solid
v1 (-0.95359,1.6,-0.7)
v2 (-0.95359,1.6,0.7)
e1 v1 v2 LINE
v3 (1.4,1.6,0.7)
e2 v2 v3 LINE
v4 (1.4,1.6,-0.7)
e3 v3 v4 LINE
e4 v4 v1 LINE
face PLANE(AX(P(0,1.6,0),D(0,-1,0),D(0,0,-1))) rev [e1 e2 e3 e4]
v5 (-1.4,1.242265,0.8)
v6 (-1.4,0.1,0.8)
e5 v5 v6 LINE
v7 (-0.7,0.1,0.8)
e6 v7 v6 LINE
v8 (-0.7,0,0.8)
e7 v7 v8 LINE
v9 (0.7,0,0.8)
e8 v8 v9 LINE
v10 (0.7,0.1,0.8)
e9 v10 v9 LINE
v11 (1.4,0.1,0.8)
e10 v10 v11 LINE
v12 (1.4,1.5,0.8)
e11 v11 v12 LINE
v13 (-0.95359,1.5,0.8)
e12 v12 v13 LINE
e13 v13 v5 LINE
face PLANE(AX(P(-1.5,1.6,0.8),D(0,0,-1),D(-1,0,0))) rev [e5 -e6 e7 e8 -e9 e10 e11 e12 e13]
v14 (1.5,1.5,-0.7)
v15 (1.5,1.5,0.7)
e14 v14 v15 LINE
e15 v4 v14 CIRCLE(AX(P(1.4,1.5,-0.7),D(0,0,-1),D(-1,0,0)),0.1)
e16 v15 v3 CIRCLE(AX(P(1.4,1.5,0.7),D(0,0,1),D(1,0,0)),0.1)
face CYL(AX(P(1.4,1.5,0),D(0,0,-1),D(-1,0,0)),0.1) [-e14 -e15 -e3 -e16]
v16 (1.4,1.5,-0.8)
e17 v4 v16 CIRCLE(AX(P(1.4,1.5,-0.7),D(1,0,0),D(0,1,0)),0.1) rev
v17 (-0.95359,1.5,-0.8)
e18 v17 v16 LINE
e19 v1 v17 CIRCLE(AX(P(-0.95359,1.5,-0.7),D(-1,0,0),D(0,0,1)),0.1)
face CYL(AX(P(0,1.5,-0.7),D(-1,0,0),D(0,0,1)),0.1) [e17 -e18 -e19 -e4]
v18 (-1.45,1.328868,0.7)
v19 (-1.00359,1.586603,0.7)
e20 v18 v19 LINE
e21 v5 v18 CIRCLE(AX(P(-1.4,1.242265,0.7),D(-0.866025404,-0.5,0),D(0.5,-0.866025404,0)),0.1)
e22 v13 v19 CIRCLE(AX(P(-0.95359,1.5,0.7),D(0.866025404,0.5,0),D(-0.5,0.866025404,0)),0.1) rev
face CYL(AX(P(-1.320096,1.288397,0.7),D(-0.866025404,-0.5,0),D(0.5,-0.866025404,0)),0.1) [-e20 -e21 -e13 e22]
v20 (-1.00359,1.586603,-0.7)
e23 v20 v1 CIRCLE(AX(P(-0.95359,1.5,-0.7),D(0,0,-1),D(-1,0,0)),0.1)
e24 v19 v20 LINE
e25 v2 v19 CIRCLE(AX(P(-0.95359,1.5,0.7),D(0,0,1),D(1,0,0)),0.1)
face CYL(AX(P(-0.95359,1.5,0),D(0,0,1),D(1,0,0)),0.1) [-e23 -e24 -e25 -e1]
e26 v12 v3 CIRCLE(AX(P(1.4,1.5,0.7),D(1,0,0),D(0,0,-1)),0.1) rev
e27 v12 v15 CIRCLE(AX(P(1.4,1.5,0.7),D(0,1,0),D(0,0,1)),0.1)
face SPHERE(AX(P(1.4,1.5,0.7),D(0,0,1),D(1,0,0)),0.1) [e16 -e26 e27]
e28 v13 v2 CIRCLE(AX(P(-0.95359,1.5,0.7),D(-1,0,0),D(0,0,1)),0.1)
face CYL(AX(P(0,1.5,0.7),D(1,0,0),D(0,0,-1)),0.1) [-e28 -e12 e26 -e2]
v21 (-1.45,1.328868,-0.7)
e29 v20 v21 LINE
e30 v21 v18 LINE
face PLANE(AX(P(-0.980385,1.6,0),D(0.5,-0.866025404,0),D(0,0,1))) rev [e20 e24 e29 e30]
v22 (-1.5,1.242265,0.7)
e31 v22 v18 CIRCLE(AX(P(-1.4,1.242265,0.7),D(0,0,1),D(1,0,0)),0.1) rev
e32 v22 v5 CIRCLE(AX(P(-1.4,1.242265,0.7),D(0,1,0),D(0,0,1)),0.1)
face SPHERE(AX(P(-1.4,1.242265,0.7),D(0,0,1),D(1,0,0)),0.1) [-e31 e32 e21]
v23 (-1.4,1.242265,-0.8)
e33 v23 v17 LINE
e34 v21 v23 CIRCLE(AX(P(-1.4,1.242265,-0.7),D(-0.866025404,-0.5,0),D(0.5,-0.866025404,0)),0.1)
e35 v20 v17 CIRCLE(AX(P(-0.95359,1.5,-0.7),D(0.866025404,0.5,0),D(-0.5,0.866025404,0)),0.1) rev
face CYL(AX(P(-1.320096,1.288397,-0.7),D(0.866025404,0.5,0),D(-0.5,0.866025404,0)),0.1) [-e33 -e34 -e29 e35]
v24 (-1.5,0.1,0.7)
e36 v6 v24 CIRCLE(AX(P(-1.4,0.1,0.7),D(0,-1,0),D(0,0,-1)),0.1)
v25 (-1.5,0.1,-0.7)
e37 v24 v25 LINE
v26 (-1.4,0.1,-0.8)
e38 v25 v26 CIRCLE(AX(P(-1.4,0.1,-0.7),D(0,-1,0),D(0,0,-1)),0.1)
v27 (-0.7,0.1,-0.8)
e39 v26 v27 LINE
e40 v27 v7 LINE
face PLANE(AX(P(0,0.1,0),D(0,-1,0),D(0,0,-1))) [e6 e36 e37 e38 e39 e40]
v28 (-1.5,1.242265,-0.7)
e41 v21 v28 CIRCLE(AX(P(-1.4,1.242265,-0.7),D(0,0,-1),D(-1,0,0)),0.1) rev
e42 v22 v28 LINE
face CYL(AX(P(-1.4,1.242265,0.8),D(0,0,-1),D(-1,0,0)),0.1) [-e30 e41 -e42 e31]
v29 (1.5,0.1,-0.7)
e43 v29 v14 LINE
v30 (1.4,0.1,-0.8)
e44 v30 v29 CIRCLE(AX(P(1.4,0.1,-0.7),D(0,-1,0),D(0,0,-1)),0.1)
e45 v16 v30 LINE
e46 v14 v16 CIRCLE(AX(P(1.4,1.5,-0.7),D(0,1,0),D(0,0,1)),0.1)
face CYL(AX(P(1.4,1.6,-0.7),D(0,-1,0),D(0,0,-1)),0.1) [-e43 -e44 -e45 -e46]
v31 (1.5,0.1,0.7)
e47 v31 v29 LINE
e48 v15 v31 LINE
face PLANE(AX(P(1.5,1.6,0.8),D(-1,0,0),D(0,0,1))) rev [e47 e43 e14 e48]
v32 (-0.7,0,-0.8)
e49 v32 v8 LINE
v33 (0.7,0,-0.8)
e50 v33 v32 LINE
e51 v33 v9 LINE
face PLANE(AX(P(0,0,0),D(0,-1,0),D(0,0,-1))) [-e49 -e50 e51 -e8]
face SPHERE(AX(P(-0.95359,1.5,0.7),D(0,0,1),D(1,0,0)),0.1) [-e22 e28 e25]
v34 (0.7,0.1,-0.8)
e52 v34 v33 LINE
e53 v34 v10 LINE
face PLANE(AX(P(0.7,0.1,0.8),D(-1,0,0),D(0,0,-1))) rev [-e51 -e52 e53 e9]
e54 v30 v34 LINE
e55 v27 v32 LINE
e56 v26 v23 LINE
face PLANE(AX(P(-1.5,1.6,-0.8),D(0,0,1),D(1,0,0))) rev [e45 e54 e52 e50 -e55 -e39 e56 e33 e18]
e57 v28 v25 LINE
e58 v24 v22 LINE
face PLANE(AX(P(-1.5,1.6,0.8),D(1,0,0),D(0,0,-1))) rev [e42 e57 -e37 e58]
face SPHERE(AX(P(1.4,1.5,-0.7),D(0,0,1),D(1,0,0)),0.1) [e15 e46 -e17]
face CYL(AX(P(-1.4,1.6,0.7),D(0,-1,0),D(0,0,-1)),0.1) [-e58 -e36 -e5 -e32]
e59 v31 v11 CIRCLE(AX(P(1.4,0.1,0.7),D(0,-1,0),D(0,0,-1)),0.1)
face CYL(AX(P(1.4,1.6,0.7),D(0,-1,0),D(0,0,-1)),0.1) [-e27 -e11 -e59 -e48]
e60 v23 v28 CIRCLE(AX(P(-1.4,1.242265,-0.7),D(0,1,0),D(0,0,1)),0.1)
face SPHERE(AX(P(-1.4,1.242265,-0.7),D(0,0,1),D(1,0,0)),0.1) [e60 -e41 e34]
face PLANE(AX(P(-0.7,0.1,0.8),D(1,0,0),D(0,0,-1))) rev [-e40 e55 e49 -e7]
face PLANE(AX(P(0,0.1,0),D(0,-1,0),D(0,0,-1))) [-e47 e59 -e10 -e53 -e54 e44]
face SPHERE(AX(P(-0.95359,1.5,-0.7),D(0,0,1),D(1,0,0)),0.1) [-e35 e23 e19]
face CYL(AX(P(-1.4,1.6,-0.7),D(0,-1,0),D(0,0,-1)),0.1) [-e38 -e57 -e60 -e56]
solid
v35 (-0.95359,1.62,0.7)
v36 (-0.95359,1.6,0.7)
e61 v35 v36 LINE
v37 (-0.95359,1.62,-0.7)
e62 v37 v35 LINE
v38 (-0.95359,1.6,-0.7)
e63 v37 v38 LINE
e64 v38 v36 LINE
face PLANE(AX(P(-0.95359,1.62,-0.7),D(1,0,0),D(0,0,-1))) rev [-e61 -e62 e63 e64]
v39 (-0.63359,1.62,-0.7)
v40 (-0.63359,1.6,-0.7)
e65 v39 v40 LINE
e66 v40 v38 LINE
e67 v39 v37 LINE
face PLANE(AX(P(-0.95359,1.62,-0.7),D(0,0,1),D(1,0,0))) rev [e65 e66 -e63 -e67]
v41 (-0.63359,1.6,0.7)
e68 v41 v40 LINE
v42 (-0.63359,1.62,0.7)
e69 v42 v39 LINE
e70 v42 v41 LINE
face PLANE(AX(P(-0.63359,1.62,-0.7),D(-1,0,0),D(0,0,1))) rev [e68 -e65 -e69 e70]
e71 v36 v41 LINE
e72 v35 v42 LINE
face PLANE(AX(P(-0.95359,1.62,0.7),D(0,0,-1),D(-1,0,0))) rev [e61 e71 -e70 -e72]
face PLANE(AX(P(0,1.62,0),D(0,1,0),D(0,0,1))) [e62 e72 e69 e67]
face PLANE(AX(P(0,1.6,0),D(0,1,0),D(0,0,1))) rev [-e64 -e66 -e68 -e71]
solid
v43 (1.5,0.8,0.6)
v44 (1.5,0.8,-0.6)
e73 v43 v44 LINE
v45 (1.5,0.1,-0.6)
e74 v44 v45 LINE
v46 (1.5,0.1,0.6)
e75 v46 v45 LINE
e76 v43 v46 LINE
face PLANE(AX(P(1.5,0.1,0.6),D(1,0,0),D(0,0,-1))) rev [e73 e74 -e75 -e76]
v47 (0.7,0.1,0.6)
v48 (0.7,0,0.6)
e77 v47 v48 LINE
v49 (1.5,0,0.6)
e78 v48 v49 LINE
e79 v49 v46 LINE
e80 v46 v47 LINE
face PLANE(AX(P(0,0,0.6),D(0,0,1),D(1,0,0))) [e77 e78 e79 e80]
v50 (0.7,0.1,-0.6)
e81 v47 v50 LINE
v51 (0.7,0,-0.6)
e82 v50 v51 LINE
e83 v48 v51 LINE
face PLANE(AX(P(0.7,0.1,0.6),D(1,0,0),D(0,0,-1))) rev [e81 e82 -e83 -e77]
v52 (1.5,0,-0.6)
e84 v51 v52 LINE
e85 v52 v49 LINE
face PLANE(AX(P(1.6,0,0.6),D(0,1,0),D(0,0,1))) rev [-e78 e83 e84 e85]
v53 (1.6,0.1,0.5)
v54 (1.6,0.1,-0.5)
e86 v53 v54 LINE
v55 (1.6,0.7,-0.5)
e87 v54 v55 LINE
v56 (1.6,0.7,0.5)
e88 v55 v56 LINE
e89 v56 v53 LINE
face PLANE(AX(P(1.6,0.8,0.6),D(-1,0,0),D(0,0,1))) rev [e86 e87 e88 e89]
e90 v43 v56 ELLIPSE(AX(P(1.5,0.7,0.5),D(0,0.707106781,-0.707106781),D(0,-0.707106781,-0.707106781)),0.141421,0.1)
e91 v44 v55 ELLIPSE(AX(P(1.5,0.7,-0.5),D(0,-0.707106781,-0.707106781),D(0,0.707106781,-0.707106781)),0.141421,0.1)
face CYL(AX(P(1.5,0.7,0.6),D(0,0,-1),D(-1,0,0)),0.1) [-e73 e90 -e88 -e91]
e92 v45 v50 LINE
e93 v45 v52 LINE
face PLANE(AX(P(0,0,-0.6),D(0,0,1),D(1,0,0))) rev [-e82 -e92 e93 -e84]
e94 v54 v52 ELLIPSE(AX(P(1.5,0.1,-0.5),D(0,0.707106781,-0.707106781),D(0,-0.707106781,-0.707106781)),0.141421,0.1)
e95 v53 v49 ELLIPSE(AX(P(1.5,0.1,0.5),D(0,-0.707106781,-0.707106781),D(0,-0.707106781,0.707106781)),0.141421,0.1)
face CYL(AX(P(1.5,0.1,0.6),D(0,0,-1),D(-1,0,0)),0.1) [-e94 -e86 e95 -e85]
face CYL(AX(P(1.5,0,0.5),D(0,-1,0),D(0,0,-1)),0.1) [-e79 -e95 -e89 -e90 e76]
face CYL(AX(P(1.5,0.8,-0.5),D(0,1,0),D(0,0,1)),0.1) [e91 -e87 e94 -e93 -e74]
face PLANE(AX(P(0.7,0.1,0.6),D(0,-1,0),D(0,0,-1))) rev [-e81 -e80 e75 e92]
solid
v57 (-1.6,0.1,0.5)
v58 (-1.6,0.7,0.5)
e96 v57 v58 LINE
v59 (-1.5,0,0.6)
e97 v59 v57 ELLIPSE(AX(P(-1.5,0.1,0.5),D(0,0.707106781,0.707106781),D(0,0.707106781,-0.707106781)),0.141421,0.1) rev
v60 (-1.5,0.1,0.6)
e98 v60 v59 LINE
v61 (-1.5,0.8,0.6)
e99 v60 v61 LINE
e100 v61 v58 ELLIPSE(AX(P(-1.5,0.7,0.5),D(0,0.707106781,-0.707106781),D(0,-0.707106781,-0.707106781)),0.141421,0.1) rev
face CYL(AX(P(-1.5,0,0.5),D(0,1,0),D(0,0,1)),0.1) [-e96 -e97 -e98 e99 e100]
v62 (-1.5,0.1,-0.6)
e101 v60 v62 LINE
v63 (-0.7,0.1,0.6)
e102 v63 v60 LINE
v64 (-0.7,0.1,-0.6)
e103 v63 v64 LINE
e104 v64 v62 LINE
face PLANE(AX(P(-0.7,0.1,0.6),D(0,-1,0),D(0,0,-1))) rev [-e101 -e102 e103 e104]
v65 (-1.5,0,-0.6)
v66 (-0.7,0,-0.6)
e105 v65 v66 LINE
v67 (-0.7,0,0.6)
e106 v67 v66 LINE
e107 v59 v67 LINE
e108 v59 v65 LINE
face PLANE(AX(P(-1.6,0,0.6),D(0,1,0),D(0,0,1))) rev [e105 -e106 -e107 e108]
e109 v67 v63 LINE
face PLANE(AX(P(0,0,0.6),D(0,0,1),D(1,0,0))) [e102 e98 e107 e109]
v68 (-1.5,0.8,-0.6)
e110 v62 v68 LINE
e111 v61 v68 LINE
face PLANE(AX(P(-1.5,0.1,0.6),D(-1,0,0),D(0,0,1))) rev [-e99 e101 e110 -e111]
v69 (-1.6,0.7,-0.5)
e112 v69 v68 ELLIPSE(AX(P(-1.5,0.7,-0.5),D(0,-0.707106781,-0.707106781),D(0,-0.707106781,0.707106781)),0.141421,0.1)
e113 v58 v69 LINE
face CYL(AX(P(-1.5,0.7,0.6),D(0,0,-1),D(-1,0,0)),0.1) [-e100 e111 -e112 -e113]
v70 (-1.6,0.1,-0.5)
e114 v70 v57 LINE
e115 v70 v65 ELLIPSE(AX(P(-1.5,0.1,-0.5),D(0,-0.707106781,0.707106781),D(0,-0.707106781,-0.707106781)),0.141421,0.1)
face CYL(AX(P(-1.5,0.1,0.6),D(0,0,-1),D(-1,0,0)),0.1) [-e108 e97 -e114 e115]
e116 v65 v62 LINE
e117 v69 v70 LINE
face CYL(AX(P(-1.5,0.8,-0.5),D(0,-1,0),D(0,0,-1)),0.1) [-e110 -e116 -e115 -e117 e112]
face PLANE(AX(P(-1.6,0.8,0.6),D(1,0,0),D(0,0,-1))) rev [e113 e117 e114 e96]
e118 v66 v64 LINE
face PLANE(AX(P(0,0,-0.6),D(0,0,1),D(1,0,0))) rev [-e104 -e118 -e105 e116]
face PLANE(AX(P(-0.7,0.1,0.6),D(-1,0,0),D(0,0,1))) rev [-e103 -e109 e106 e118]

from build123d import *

# Parameters (mm, degrees)
SKETCH_1_W             = 3
SKETCH_1_H             = 1.6
EXTRUDE_1_DEPTH        = 1.6
SKETCH_3_W             = 0.8
SKETCH_3_H             = 1.6
EXTRUDE_2_DEPTH        = 0.1
EXTRUDE_3_DEPTH        = 0.6
EXTRUDE_3_DEPTH_BACK   = 0.6
EXTRUDE_3_2_DEPTH      = 0.6
EXTRUDE_3_2_DEPTH_BACK = 0.6
CHAMFER_1_SIZE         = 0.3
CHAMFER_1_SIZE2        = 0.519615242
FILLET_1_R             = 0.1
SKETCH_7_W             = 0.32
SKETCH_7_H             = 1.4
EXTRUDE_4_DEPTH        = 0.02
FILLET_2_R             = 0.1
FILLET_3_R             = 0.1


with BuildPart() as part:
    # Эскиз1 → Бобышка-Вытянуть1 (new body)
    with BuildSketch(Plane(origin=(0, 0, 0), x_dir=(1, 0, 0), z_dir=(0, 1, 0))):
        Rectangle(SKETCH_1_W, SKETCH_1_H)
    extrude(amount=EXTRUDE_1_DEPTH)


with BuildPart() as body_2:
    # Эскиз3 → Бобышка-Вытянуть2 (new body)
    with BuildSketch(Plane.XZ):
        with Locations((-1.1, 0)):
            Rectangle(SKETCH_3_W, SKETCH_3_H)
    extrude(amount=-EXTRUDE_2_DEPTH)


with BuildPart() as body_3:
    # Зеркальное отражение1: mirrored copy
    add(body_2.part.mirror(Plane(origin=(0, 0, 0), x_dir=(0, 0, 1), z_dir=(1, 0, 0))))


with BuildPart() as part_1:
    add(part.part)

    # Combine 1: cut body 2, body 3
    add(body_2.part, mode=Mode.SUBTRACT)
    add(body_3.part, mode=Mode.SUBTRACT)

    # Фаска1
    chamfer_1_edges = [part_1.edges().sort_by_distance(p)[0] for p in [
        (-1.5, 1.6, 0),
    ]]
    chamfer_1_side = [part_1.faces().sort_by_distance(p)[0] for p in [
        (-1.5, 0.85, 0),
    ]]
    chamfer(chamfer_1_edges, length=CHAMFER_1_SIZE, length2=CHAMFER_1_SIZE2, reference=chamfer_1_side[0])

    # Скругление1
    fillet_1_edges = [part_1.edges().sort_by_distance(p)[0] for p in [
        (0.259807621, 1.6, 0.8),
        (1.5, 1.6, 0),
        (-0.980384758, 1.6, 0),
        (-1.5, 0.7, 0.8),
        (-1.240192379, 1.45, 0.8),
        (-1.5, 0.7, -0.8),
        (-1.5, 1.3, 0),
        (-1.240192379, 1.45, -0.8),
        (0.259807621, 1.6, -0.8),
        (1.5, 0.85, 0.8),
        (1.5, 0.85, -0.8),
    ]]
    fillet(fillet_1_edges, radius=FILLET_1_R)


with BuildPart() as body_2_2:
    # Эскиз5 → Бобышка-Вытянуть3 (new, two sides: drawn at the far end of the back side and taken through both)
    with BuildSketch(Plane.XY.offset(-EXTRUDE_3_DEPTH_BACK)):
        Polygon((-0.7, 0.1), (-1.5, 0.1), (-1.5, 0.8), (-1.6, 0.8), (-1.6, 0), (-0.7, 0), align=None)
    extrude(amount=EXTRUDE_3_DEPTH + EXTRUDE_3_DEPTH_BACK)

    # Скругление3
    fillet_3_edges = [body_2_2.edges().sort_by_distance(p)[0] for p in [
        (-1.6, 0, 0),
        (-1.6, 0.4, 0.6),
        (-1.6, 0.8, 0),
        (-1.6, 0.4, -0.6),
    ]]
    fillet(fillet_3_edges, radius=FILLET_3_R - 0.0001)  # a hair under: the kernel refuses the full size


with BuildPart() as body_3_2:
    # Эскиз5 → Extrude 3 2 (new, two sides: drawn at the far end of the back side and taken through both)
    with BuildSketch(Plane.XY.offset(-EXTRUDE_3_2_DEPTH_BACK)):
        Polygon((1.5, 0.1), (1.5, 0.8), (1.6, 0.8), (1.6, 0), (0.7, 0), (0.7, 0.1), align=None)
    extrude(amount=EXTRUDE_3_2_DEPTH + EXTRUDE_3_2_DEPTH_BACK)

    # Скругление2
    fillet_2_edges = [body_3_2.edges().sort_by_distance(p)[0] for p in [
        (1.6, 0.4, -0.6),
        (1.6, 0, 0),
        (1.6, 0.4, 0.6),
        (1.6, 0.8, 0),
    ]]
    fillet(fillet_2_edges, radius=FILLET_2_R - 0.0001)  # a hair under: the kernel refuses the full size


with BuildPart() as body_4:
    # Эскиз7 → Бобышка-Вытянуть4 (new body)
    with BuildSketch(Plane(origin=(0, 1.6, 0), x_dir=(1, 0, 0), z_dir=(0, 1, 0))):
        with Locations((-0.793589838, 0)):
            Rectangle(SKETCH_7_W, SKETCH_7_H)
    extrude(amount=EXTRUDE_4_DEPTH)


solid = Compound([part_1.part, body_2_2.part, body_3_2.part, body_4.part])
